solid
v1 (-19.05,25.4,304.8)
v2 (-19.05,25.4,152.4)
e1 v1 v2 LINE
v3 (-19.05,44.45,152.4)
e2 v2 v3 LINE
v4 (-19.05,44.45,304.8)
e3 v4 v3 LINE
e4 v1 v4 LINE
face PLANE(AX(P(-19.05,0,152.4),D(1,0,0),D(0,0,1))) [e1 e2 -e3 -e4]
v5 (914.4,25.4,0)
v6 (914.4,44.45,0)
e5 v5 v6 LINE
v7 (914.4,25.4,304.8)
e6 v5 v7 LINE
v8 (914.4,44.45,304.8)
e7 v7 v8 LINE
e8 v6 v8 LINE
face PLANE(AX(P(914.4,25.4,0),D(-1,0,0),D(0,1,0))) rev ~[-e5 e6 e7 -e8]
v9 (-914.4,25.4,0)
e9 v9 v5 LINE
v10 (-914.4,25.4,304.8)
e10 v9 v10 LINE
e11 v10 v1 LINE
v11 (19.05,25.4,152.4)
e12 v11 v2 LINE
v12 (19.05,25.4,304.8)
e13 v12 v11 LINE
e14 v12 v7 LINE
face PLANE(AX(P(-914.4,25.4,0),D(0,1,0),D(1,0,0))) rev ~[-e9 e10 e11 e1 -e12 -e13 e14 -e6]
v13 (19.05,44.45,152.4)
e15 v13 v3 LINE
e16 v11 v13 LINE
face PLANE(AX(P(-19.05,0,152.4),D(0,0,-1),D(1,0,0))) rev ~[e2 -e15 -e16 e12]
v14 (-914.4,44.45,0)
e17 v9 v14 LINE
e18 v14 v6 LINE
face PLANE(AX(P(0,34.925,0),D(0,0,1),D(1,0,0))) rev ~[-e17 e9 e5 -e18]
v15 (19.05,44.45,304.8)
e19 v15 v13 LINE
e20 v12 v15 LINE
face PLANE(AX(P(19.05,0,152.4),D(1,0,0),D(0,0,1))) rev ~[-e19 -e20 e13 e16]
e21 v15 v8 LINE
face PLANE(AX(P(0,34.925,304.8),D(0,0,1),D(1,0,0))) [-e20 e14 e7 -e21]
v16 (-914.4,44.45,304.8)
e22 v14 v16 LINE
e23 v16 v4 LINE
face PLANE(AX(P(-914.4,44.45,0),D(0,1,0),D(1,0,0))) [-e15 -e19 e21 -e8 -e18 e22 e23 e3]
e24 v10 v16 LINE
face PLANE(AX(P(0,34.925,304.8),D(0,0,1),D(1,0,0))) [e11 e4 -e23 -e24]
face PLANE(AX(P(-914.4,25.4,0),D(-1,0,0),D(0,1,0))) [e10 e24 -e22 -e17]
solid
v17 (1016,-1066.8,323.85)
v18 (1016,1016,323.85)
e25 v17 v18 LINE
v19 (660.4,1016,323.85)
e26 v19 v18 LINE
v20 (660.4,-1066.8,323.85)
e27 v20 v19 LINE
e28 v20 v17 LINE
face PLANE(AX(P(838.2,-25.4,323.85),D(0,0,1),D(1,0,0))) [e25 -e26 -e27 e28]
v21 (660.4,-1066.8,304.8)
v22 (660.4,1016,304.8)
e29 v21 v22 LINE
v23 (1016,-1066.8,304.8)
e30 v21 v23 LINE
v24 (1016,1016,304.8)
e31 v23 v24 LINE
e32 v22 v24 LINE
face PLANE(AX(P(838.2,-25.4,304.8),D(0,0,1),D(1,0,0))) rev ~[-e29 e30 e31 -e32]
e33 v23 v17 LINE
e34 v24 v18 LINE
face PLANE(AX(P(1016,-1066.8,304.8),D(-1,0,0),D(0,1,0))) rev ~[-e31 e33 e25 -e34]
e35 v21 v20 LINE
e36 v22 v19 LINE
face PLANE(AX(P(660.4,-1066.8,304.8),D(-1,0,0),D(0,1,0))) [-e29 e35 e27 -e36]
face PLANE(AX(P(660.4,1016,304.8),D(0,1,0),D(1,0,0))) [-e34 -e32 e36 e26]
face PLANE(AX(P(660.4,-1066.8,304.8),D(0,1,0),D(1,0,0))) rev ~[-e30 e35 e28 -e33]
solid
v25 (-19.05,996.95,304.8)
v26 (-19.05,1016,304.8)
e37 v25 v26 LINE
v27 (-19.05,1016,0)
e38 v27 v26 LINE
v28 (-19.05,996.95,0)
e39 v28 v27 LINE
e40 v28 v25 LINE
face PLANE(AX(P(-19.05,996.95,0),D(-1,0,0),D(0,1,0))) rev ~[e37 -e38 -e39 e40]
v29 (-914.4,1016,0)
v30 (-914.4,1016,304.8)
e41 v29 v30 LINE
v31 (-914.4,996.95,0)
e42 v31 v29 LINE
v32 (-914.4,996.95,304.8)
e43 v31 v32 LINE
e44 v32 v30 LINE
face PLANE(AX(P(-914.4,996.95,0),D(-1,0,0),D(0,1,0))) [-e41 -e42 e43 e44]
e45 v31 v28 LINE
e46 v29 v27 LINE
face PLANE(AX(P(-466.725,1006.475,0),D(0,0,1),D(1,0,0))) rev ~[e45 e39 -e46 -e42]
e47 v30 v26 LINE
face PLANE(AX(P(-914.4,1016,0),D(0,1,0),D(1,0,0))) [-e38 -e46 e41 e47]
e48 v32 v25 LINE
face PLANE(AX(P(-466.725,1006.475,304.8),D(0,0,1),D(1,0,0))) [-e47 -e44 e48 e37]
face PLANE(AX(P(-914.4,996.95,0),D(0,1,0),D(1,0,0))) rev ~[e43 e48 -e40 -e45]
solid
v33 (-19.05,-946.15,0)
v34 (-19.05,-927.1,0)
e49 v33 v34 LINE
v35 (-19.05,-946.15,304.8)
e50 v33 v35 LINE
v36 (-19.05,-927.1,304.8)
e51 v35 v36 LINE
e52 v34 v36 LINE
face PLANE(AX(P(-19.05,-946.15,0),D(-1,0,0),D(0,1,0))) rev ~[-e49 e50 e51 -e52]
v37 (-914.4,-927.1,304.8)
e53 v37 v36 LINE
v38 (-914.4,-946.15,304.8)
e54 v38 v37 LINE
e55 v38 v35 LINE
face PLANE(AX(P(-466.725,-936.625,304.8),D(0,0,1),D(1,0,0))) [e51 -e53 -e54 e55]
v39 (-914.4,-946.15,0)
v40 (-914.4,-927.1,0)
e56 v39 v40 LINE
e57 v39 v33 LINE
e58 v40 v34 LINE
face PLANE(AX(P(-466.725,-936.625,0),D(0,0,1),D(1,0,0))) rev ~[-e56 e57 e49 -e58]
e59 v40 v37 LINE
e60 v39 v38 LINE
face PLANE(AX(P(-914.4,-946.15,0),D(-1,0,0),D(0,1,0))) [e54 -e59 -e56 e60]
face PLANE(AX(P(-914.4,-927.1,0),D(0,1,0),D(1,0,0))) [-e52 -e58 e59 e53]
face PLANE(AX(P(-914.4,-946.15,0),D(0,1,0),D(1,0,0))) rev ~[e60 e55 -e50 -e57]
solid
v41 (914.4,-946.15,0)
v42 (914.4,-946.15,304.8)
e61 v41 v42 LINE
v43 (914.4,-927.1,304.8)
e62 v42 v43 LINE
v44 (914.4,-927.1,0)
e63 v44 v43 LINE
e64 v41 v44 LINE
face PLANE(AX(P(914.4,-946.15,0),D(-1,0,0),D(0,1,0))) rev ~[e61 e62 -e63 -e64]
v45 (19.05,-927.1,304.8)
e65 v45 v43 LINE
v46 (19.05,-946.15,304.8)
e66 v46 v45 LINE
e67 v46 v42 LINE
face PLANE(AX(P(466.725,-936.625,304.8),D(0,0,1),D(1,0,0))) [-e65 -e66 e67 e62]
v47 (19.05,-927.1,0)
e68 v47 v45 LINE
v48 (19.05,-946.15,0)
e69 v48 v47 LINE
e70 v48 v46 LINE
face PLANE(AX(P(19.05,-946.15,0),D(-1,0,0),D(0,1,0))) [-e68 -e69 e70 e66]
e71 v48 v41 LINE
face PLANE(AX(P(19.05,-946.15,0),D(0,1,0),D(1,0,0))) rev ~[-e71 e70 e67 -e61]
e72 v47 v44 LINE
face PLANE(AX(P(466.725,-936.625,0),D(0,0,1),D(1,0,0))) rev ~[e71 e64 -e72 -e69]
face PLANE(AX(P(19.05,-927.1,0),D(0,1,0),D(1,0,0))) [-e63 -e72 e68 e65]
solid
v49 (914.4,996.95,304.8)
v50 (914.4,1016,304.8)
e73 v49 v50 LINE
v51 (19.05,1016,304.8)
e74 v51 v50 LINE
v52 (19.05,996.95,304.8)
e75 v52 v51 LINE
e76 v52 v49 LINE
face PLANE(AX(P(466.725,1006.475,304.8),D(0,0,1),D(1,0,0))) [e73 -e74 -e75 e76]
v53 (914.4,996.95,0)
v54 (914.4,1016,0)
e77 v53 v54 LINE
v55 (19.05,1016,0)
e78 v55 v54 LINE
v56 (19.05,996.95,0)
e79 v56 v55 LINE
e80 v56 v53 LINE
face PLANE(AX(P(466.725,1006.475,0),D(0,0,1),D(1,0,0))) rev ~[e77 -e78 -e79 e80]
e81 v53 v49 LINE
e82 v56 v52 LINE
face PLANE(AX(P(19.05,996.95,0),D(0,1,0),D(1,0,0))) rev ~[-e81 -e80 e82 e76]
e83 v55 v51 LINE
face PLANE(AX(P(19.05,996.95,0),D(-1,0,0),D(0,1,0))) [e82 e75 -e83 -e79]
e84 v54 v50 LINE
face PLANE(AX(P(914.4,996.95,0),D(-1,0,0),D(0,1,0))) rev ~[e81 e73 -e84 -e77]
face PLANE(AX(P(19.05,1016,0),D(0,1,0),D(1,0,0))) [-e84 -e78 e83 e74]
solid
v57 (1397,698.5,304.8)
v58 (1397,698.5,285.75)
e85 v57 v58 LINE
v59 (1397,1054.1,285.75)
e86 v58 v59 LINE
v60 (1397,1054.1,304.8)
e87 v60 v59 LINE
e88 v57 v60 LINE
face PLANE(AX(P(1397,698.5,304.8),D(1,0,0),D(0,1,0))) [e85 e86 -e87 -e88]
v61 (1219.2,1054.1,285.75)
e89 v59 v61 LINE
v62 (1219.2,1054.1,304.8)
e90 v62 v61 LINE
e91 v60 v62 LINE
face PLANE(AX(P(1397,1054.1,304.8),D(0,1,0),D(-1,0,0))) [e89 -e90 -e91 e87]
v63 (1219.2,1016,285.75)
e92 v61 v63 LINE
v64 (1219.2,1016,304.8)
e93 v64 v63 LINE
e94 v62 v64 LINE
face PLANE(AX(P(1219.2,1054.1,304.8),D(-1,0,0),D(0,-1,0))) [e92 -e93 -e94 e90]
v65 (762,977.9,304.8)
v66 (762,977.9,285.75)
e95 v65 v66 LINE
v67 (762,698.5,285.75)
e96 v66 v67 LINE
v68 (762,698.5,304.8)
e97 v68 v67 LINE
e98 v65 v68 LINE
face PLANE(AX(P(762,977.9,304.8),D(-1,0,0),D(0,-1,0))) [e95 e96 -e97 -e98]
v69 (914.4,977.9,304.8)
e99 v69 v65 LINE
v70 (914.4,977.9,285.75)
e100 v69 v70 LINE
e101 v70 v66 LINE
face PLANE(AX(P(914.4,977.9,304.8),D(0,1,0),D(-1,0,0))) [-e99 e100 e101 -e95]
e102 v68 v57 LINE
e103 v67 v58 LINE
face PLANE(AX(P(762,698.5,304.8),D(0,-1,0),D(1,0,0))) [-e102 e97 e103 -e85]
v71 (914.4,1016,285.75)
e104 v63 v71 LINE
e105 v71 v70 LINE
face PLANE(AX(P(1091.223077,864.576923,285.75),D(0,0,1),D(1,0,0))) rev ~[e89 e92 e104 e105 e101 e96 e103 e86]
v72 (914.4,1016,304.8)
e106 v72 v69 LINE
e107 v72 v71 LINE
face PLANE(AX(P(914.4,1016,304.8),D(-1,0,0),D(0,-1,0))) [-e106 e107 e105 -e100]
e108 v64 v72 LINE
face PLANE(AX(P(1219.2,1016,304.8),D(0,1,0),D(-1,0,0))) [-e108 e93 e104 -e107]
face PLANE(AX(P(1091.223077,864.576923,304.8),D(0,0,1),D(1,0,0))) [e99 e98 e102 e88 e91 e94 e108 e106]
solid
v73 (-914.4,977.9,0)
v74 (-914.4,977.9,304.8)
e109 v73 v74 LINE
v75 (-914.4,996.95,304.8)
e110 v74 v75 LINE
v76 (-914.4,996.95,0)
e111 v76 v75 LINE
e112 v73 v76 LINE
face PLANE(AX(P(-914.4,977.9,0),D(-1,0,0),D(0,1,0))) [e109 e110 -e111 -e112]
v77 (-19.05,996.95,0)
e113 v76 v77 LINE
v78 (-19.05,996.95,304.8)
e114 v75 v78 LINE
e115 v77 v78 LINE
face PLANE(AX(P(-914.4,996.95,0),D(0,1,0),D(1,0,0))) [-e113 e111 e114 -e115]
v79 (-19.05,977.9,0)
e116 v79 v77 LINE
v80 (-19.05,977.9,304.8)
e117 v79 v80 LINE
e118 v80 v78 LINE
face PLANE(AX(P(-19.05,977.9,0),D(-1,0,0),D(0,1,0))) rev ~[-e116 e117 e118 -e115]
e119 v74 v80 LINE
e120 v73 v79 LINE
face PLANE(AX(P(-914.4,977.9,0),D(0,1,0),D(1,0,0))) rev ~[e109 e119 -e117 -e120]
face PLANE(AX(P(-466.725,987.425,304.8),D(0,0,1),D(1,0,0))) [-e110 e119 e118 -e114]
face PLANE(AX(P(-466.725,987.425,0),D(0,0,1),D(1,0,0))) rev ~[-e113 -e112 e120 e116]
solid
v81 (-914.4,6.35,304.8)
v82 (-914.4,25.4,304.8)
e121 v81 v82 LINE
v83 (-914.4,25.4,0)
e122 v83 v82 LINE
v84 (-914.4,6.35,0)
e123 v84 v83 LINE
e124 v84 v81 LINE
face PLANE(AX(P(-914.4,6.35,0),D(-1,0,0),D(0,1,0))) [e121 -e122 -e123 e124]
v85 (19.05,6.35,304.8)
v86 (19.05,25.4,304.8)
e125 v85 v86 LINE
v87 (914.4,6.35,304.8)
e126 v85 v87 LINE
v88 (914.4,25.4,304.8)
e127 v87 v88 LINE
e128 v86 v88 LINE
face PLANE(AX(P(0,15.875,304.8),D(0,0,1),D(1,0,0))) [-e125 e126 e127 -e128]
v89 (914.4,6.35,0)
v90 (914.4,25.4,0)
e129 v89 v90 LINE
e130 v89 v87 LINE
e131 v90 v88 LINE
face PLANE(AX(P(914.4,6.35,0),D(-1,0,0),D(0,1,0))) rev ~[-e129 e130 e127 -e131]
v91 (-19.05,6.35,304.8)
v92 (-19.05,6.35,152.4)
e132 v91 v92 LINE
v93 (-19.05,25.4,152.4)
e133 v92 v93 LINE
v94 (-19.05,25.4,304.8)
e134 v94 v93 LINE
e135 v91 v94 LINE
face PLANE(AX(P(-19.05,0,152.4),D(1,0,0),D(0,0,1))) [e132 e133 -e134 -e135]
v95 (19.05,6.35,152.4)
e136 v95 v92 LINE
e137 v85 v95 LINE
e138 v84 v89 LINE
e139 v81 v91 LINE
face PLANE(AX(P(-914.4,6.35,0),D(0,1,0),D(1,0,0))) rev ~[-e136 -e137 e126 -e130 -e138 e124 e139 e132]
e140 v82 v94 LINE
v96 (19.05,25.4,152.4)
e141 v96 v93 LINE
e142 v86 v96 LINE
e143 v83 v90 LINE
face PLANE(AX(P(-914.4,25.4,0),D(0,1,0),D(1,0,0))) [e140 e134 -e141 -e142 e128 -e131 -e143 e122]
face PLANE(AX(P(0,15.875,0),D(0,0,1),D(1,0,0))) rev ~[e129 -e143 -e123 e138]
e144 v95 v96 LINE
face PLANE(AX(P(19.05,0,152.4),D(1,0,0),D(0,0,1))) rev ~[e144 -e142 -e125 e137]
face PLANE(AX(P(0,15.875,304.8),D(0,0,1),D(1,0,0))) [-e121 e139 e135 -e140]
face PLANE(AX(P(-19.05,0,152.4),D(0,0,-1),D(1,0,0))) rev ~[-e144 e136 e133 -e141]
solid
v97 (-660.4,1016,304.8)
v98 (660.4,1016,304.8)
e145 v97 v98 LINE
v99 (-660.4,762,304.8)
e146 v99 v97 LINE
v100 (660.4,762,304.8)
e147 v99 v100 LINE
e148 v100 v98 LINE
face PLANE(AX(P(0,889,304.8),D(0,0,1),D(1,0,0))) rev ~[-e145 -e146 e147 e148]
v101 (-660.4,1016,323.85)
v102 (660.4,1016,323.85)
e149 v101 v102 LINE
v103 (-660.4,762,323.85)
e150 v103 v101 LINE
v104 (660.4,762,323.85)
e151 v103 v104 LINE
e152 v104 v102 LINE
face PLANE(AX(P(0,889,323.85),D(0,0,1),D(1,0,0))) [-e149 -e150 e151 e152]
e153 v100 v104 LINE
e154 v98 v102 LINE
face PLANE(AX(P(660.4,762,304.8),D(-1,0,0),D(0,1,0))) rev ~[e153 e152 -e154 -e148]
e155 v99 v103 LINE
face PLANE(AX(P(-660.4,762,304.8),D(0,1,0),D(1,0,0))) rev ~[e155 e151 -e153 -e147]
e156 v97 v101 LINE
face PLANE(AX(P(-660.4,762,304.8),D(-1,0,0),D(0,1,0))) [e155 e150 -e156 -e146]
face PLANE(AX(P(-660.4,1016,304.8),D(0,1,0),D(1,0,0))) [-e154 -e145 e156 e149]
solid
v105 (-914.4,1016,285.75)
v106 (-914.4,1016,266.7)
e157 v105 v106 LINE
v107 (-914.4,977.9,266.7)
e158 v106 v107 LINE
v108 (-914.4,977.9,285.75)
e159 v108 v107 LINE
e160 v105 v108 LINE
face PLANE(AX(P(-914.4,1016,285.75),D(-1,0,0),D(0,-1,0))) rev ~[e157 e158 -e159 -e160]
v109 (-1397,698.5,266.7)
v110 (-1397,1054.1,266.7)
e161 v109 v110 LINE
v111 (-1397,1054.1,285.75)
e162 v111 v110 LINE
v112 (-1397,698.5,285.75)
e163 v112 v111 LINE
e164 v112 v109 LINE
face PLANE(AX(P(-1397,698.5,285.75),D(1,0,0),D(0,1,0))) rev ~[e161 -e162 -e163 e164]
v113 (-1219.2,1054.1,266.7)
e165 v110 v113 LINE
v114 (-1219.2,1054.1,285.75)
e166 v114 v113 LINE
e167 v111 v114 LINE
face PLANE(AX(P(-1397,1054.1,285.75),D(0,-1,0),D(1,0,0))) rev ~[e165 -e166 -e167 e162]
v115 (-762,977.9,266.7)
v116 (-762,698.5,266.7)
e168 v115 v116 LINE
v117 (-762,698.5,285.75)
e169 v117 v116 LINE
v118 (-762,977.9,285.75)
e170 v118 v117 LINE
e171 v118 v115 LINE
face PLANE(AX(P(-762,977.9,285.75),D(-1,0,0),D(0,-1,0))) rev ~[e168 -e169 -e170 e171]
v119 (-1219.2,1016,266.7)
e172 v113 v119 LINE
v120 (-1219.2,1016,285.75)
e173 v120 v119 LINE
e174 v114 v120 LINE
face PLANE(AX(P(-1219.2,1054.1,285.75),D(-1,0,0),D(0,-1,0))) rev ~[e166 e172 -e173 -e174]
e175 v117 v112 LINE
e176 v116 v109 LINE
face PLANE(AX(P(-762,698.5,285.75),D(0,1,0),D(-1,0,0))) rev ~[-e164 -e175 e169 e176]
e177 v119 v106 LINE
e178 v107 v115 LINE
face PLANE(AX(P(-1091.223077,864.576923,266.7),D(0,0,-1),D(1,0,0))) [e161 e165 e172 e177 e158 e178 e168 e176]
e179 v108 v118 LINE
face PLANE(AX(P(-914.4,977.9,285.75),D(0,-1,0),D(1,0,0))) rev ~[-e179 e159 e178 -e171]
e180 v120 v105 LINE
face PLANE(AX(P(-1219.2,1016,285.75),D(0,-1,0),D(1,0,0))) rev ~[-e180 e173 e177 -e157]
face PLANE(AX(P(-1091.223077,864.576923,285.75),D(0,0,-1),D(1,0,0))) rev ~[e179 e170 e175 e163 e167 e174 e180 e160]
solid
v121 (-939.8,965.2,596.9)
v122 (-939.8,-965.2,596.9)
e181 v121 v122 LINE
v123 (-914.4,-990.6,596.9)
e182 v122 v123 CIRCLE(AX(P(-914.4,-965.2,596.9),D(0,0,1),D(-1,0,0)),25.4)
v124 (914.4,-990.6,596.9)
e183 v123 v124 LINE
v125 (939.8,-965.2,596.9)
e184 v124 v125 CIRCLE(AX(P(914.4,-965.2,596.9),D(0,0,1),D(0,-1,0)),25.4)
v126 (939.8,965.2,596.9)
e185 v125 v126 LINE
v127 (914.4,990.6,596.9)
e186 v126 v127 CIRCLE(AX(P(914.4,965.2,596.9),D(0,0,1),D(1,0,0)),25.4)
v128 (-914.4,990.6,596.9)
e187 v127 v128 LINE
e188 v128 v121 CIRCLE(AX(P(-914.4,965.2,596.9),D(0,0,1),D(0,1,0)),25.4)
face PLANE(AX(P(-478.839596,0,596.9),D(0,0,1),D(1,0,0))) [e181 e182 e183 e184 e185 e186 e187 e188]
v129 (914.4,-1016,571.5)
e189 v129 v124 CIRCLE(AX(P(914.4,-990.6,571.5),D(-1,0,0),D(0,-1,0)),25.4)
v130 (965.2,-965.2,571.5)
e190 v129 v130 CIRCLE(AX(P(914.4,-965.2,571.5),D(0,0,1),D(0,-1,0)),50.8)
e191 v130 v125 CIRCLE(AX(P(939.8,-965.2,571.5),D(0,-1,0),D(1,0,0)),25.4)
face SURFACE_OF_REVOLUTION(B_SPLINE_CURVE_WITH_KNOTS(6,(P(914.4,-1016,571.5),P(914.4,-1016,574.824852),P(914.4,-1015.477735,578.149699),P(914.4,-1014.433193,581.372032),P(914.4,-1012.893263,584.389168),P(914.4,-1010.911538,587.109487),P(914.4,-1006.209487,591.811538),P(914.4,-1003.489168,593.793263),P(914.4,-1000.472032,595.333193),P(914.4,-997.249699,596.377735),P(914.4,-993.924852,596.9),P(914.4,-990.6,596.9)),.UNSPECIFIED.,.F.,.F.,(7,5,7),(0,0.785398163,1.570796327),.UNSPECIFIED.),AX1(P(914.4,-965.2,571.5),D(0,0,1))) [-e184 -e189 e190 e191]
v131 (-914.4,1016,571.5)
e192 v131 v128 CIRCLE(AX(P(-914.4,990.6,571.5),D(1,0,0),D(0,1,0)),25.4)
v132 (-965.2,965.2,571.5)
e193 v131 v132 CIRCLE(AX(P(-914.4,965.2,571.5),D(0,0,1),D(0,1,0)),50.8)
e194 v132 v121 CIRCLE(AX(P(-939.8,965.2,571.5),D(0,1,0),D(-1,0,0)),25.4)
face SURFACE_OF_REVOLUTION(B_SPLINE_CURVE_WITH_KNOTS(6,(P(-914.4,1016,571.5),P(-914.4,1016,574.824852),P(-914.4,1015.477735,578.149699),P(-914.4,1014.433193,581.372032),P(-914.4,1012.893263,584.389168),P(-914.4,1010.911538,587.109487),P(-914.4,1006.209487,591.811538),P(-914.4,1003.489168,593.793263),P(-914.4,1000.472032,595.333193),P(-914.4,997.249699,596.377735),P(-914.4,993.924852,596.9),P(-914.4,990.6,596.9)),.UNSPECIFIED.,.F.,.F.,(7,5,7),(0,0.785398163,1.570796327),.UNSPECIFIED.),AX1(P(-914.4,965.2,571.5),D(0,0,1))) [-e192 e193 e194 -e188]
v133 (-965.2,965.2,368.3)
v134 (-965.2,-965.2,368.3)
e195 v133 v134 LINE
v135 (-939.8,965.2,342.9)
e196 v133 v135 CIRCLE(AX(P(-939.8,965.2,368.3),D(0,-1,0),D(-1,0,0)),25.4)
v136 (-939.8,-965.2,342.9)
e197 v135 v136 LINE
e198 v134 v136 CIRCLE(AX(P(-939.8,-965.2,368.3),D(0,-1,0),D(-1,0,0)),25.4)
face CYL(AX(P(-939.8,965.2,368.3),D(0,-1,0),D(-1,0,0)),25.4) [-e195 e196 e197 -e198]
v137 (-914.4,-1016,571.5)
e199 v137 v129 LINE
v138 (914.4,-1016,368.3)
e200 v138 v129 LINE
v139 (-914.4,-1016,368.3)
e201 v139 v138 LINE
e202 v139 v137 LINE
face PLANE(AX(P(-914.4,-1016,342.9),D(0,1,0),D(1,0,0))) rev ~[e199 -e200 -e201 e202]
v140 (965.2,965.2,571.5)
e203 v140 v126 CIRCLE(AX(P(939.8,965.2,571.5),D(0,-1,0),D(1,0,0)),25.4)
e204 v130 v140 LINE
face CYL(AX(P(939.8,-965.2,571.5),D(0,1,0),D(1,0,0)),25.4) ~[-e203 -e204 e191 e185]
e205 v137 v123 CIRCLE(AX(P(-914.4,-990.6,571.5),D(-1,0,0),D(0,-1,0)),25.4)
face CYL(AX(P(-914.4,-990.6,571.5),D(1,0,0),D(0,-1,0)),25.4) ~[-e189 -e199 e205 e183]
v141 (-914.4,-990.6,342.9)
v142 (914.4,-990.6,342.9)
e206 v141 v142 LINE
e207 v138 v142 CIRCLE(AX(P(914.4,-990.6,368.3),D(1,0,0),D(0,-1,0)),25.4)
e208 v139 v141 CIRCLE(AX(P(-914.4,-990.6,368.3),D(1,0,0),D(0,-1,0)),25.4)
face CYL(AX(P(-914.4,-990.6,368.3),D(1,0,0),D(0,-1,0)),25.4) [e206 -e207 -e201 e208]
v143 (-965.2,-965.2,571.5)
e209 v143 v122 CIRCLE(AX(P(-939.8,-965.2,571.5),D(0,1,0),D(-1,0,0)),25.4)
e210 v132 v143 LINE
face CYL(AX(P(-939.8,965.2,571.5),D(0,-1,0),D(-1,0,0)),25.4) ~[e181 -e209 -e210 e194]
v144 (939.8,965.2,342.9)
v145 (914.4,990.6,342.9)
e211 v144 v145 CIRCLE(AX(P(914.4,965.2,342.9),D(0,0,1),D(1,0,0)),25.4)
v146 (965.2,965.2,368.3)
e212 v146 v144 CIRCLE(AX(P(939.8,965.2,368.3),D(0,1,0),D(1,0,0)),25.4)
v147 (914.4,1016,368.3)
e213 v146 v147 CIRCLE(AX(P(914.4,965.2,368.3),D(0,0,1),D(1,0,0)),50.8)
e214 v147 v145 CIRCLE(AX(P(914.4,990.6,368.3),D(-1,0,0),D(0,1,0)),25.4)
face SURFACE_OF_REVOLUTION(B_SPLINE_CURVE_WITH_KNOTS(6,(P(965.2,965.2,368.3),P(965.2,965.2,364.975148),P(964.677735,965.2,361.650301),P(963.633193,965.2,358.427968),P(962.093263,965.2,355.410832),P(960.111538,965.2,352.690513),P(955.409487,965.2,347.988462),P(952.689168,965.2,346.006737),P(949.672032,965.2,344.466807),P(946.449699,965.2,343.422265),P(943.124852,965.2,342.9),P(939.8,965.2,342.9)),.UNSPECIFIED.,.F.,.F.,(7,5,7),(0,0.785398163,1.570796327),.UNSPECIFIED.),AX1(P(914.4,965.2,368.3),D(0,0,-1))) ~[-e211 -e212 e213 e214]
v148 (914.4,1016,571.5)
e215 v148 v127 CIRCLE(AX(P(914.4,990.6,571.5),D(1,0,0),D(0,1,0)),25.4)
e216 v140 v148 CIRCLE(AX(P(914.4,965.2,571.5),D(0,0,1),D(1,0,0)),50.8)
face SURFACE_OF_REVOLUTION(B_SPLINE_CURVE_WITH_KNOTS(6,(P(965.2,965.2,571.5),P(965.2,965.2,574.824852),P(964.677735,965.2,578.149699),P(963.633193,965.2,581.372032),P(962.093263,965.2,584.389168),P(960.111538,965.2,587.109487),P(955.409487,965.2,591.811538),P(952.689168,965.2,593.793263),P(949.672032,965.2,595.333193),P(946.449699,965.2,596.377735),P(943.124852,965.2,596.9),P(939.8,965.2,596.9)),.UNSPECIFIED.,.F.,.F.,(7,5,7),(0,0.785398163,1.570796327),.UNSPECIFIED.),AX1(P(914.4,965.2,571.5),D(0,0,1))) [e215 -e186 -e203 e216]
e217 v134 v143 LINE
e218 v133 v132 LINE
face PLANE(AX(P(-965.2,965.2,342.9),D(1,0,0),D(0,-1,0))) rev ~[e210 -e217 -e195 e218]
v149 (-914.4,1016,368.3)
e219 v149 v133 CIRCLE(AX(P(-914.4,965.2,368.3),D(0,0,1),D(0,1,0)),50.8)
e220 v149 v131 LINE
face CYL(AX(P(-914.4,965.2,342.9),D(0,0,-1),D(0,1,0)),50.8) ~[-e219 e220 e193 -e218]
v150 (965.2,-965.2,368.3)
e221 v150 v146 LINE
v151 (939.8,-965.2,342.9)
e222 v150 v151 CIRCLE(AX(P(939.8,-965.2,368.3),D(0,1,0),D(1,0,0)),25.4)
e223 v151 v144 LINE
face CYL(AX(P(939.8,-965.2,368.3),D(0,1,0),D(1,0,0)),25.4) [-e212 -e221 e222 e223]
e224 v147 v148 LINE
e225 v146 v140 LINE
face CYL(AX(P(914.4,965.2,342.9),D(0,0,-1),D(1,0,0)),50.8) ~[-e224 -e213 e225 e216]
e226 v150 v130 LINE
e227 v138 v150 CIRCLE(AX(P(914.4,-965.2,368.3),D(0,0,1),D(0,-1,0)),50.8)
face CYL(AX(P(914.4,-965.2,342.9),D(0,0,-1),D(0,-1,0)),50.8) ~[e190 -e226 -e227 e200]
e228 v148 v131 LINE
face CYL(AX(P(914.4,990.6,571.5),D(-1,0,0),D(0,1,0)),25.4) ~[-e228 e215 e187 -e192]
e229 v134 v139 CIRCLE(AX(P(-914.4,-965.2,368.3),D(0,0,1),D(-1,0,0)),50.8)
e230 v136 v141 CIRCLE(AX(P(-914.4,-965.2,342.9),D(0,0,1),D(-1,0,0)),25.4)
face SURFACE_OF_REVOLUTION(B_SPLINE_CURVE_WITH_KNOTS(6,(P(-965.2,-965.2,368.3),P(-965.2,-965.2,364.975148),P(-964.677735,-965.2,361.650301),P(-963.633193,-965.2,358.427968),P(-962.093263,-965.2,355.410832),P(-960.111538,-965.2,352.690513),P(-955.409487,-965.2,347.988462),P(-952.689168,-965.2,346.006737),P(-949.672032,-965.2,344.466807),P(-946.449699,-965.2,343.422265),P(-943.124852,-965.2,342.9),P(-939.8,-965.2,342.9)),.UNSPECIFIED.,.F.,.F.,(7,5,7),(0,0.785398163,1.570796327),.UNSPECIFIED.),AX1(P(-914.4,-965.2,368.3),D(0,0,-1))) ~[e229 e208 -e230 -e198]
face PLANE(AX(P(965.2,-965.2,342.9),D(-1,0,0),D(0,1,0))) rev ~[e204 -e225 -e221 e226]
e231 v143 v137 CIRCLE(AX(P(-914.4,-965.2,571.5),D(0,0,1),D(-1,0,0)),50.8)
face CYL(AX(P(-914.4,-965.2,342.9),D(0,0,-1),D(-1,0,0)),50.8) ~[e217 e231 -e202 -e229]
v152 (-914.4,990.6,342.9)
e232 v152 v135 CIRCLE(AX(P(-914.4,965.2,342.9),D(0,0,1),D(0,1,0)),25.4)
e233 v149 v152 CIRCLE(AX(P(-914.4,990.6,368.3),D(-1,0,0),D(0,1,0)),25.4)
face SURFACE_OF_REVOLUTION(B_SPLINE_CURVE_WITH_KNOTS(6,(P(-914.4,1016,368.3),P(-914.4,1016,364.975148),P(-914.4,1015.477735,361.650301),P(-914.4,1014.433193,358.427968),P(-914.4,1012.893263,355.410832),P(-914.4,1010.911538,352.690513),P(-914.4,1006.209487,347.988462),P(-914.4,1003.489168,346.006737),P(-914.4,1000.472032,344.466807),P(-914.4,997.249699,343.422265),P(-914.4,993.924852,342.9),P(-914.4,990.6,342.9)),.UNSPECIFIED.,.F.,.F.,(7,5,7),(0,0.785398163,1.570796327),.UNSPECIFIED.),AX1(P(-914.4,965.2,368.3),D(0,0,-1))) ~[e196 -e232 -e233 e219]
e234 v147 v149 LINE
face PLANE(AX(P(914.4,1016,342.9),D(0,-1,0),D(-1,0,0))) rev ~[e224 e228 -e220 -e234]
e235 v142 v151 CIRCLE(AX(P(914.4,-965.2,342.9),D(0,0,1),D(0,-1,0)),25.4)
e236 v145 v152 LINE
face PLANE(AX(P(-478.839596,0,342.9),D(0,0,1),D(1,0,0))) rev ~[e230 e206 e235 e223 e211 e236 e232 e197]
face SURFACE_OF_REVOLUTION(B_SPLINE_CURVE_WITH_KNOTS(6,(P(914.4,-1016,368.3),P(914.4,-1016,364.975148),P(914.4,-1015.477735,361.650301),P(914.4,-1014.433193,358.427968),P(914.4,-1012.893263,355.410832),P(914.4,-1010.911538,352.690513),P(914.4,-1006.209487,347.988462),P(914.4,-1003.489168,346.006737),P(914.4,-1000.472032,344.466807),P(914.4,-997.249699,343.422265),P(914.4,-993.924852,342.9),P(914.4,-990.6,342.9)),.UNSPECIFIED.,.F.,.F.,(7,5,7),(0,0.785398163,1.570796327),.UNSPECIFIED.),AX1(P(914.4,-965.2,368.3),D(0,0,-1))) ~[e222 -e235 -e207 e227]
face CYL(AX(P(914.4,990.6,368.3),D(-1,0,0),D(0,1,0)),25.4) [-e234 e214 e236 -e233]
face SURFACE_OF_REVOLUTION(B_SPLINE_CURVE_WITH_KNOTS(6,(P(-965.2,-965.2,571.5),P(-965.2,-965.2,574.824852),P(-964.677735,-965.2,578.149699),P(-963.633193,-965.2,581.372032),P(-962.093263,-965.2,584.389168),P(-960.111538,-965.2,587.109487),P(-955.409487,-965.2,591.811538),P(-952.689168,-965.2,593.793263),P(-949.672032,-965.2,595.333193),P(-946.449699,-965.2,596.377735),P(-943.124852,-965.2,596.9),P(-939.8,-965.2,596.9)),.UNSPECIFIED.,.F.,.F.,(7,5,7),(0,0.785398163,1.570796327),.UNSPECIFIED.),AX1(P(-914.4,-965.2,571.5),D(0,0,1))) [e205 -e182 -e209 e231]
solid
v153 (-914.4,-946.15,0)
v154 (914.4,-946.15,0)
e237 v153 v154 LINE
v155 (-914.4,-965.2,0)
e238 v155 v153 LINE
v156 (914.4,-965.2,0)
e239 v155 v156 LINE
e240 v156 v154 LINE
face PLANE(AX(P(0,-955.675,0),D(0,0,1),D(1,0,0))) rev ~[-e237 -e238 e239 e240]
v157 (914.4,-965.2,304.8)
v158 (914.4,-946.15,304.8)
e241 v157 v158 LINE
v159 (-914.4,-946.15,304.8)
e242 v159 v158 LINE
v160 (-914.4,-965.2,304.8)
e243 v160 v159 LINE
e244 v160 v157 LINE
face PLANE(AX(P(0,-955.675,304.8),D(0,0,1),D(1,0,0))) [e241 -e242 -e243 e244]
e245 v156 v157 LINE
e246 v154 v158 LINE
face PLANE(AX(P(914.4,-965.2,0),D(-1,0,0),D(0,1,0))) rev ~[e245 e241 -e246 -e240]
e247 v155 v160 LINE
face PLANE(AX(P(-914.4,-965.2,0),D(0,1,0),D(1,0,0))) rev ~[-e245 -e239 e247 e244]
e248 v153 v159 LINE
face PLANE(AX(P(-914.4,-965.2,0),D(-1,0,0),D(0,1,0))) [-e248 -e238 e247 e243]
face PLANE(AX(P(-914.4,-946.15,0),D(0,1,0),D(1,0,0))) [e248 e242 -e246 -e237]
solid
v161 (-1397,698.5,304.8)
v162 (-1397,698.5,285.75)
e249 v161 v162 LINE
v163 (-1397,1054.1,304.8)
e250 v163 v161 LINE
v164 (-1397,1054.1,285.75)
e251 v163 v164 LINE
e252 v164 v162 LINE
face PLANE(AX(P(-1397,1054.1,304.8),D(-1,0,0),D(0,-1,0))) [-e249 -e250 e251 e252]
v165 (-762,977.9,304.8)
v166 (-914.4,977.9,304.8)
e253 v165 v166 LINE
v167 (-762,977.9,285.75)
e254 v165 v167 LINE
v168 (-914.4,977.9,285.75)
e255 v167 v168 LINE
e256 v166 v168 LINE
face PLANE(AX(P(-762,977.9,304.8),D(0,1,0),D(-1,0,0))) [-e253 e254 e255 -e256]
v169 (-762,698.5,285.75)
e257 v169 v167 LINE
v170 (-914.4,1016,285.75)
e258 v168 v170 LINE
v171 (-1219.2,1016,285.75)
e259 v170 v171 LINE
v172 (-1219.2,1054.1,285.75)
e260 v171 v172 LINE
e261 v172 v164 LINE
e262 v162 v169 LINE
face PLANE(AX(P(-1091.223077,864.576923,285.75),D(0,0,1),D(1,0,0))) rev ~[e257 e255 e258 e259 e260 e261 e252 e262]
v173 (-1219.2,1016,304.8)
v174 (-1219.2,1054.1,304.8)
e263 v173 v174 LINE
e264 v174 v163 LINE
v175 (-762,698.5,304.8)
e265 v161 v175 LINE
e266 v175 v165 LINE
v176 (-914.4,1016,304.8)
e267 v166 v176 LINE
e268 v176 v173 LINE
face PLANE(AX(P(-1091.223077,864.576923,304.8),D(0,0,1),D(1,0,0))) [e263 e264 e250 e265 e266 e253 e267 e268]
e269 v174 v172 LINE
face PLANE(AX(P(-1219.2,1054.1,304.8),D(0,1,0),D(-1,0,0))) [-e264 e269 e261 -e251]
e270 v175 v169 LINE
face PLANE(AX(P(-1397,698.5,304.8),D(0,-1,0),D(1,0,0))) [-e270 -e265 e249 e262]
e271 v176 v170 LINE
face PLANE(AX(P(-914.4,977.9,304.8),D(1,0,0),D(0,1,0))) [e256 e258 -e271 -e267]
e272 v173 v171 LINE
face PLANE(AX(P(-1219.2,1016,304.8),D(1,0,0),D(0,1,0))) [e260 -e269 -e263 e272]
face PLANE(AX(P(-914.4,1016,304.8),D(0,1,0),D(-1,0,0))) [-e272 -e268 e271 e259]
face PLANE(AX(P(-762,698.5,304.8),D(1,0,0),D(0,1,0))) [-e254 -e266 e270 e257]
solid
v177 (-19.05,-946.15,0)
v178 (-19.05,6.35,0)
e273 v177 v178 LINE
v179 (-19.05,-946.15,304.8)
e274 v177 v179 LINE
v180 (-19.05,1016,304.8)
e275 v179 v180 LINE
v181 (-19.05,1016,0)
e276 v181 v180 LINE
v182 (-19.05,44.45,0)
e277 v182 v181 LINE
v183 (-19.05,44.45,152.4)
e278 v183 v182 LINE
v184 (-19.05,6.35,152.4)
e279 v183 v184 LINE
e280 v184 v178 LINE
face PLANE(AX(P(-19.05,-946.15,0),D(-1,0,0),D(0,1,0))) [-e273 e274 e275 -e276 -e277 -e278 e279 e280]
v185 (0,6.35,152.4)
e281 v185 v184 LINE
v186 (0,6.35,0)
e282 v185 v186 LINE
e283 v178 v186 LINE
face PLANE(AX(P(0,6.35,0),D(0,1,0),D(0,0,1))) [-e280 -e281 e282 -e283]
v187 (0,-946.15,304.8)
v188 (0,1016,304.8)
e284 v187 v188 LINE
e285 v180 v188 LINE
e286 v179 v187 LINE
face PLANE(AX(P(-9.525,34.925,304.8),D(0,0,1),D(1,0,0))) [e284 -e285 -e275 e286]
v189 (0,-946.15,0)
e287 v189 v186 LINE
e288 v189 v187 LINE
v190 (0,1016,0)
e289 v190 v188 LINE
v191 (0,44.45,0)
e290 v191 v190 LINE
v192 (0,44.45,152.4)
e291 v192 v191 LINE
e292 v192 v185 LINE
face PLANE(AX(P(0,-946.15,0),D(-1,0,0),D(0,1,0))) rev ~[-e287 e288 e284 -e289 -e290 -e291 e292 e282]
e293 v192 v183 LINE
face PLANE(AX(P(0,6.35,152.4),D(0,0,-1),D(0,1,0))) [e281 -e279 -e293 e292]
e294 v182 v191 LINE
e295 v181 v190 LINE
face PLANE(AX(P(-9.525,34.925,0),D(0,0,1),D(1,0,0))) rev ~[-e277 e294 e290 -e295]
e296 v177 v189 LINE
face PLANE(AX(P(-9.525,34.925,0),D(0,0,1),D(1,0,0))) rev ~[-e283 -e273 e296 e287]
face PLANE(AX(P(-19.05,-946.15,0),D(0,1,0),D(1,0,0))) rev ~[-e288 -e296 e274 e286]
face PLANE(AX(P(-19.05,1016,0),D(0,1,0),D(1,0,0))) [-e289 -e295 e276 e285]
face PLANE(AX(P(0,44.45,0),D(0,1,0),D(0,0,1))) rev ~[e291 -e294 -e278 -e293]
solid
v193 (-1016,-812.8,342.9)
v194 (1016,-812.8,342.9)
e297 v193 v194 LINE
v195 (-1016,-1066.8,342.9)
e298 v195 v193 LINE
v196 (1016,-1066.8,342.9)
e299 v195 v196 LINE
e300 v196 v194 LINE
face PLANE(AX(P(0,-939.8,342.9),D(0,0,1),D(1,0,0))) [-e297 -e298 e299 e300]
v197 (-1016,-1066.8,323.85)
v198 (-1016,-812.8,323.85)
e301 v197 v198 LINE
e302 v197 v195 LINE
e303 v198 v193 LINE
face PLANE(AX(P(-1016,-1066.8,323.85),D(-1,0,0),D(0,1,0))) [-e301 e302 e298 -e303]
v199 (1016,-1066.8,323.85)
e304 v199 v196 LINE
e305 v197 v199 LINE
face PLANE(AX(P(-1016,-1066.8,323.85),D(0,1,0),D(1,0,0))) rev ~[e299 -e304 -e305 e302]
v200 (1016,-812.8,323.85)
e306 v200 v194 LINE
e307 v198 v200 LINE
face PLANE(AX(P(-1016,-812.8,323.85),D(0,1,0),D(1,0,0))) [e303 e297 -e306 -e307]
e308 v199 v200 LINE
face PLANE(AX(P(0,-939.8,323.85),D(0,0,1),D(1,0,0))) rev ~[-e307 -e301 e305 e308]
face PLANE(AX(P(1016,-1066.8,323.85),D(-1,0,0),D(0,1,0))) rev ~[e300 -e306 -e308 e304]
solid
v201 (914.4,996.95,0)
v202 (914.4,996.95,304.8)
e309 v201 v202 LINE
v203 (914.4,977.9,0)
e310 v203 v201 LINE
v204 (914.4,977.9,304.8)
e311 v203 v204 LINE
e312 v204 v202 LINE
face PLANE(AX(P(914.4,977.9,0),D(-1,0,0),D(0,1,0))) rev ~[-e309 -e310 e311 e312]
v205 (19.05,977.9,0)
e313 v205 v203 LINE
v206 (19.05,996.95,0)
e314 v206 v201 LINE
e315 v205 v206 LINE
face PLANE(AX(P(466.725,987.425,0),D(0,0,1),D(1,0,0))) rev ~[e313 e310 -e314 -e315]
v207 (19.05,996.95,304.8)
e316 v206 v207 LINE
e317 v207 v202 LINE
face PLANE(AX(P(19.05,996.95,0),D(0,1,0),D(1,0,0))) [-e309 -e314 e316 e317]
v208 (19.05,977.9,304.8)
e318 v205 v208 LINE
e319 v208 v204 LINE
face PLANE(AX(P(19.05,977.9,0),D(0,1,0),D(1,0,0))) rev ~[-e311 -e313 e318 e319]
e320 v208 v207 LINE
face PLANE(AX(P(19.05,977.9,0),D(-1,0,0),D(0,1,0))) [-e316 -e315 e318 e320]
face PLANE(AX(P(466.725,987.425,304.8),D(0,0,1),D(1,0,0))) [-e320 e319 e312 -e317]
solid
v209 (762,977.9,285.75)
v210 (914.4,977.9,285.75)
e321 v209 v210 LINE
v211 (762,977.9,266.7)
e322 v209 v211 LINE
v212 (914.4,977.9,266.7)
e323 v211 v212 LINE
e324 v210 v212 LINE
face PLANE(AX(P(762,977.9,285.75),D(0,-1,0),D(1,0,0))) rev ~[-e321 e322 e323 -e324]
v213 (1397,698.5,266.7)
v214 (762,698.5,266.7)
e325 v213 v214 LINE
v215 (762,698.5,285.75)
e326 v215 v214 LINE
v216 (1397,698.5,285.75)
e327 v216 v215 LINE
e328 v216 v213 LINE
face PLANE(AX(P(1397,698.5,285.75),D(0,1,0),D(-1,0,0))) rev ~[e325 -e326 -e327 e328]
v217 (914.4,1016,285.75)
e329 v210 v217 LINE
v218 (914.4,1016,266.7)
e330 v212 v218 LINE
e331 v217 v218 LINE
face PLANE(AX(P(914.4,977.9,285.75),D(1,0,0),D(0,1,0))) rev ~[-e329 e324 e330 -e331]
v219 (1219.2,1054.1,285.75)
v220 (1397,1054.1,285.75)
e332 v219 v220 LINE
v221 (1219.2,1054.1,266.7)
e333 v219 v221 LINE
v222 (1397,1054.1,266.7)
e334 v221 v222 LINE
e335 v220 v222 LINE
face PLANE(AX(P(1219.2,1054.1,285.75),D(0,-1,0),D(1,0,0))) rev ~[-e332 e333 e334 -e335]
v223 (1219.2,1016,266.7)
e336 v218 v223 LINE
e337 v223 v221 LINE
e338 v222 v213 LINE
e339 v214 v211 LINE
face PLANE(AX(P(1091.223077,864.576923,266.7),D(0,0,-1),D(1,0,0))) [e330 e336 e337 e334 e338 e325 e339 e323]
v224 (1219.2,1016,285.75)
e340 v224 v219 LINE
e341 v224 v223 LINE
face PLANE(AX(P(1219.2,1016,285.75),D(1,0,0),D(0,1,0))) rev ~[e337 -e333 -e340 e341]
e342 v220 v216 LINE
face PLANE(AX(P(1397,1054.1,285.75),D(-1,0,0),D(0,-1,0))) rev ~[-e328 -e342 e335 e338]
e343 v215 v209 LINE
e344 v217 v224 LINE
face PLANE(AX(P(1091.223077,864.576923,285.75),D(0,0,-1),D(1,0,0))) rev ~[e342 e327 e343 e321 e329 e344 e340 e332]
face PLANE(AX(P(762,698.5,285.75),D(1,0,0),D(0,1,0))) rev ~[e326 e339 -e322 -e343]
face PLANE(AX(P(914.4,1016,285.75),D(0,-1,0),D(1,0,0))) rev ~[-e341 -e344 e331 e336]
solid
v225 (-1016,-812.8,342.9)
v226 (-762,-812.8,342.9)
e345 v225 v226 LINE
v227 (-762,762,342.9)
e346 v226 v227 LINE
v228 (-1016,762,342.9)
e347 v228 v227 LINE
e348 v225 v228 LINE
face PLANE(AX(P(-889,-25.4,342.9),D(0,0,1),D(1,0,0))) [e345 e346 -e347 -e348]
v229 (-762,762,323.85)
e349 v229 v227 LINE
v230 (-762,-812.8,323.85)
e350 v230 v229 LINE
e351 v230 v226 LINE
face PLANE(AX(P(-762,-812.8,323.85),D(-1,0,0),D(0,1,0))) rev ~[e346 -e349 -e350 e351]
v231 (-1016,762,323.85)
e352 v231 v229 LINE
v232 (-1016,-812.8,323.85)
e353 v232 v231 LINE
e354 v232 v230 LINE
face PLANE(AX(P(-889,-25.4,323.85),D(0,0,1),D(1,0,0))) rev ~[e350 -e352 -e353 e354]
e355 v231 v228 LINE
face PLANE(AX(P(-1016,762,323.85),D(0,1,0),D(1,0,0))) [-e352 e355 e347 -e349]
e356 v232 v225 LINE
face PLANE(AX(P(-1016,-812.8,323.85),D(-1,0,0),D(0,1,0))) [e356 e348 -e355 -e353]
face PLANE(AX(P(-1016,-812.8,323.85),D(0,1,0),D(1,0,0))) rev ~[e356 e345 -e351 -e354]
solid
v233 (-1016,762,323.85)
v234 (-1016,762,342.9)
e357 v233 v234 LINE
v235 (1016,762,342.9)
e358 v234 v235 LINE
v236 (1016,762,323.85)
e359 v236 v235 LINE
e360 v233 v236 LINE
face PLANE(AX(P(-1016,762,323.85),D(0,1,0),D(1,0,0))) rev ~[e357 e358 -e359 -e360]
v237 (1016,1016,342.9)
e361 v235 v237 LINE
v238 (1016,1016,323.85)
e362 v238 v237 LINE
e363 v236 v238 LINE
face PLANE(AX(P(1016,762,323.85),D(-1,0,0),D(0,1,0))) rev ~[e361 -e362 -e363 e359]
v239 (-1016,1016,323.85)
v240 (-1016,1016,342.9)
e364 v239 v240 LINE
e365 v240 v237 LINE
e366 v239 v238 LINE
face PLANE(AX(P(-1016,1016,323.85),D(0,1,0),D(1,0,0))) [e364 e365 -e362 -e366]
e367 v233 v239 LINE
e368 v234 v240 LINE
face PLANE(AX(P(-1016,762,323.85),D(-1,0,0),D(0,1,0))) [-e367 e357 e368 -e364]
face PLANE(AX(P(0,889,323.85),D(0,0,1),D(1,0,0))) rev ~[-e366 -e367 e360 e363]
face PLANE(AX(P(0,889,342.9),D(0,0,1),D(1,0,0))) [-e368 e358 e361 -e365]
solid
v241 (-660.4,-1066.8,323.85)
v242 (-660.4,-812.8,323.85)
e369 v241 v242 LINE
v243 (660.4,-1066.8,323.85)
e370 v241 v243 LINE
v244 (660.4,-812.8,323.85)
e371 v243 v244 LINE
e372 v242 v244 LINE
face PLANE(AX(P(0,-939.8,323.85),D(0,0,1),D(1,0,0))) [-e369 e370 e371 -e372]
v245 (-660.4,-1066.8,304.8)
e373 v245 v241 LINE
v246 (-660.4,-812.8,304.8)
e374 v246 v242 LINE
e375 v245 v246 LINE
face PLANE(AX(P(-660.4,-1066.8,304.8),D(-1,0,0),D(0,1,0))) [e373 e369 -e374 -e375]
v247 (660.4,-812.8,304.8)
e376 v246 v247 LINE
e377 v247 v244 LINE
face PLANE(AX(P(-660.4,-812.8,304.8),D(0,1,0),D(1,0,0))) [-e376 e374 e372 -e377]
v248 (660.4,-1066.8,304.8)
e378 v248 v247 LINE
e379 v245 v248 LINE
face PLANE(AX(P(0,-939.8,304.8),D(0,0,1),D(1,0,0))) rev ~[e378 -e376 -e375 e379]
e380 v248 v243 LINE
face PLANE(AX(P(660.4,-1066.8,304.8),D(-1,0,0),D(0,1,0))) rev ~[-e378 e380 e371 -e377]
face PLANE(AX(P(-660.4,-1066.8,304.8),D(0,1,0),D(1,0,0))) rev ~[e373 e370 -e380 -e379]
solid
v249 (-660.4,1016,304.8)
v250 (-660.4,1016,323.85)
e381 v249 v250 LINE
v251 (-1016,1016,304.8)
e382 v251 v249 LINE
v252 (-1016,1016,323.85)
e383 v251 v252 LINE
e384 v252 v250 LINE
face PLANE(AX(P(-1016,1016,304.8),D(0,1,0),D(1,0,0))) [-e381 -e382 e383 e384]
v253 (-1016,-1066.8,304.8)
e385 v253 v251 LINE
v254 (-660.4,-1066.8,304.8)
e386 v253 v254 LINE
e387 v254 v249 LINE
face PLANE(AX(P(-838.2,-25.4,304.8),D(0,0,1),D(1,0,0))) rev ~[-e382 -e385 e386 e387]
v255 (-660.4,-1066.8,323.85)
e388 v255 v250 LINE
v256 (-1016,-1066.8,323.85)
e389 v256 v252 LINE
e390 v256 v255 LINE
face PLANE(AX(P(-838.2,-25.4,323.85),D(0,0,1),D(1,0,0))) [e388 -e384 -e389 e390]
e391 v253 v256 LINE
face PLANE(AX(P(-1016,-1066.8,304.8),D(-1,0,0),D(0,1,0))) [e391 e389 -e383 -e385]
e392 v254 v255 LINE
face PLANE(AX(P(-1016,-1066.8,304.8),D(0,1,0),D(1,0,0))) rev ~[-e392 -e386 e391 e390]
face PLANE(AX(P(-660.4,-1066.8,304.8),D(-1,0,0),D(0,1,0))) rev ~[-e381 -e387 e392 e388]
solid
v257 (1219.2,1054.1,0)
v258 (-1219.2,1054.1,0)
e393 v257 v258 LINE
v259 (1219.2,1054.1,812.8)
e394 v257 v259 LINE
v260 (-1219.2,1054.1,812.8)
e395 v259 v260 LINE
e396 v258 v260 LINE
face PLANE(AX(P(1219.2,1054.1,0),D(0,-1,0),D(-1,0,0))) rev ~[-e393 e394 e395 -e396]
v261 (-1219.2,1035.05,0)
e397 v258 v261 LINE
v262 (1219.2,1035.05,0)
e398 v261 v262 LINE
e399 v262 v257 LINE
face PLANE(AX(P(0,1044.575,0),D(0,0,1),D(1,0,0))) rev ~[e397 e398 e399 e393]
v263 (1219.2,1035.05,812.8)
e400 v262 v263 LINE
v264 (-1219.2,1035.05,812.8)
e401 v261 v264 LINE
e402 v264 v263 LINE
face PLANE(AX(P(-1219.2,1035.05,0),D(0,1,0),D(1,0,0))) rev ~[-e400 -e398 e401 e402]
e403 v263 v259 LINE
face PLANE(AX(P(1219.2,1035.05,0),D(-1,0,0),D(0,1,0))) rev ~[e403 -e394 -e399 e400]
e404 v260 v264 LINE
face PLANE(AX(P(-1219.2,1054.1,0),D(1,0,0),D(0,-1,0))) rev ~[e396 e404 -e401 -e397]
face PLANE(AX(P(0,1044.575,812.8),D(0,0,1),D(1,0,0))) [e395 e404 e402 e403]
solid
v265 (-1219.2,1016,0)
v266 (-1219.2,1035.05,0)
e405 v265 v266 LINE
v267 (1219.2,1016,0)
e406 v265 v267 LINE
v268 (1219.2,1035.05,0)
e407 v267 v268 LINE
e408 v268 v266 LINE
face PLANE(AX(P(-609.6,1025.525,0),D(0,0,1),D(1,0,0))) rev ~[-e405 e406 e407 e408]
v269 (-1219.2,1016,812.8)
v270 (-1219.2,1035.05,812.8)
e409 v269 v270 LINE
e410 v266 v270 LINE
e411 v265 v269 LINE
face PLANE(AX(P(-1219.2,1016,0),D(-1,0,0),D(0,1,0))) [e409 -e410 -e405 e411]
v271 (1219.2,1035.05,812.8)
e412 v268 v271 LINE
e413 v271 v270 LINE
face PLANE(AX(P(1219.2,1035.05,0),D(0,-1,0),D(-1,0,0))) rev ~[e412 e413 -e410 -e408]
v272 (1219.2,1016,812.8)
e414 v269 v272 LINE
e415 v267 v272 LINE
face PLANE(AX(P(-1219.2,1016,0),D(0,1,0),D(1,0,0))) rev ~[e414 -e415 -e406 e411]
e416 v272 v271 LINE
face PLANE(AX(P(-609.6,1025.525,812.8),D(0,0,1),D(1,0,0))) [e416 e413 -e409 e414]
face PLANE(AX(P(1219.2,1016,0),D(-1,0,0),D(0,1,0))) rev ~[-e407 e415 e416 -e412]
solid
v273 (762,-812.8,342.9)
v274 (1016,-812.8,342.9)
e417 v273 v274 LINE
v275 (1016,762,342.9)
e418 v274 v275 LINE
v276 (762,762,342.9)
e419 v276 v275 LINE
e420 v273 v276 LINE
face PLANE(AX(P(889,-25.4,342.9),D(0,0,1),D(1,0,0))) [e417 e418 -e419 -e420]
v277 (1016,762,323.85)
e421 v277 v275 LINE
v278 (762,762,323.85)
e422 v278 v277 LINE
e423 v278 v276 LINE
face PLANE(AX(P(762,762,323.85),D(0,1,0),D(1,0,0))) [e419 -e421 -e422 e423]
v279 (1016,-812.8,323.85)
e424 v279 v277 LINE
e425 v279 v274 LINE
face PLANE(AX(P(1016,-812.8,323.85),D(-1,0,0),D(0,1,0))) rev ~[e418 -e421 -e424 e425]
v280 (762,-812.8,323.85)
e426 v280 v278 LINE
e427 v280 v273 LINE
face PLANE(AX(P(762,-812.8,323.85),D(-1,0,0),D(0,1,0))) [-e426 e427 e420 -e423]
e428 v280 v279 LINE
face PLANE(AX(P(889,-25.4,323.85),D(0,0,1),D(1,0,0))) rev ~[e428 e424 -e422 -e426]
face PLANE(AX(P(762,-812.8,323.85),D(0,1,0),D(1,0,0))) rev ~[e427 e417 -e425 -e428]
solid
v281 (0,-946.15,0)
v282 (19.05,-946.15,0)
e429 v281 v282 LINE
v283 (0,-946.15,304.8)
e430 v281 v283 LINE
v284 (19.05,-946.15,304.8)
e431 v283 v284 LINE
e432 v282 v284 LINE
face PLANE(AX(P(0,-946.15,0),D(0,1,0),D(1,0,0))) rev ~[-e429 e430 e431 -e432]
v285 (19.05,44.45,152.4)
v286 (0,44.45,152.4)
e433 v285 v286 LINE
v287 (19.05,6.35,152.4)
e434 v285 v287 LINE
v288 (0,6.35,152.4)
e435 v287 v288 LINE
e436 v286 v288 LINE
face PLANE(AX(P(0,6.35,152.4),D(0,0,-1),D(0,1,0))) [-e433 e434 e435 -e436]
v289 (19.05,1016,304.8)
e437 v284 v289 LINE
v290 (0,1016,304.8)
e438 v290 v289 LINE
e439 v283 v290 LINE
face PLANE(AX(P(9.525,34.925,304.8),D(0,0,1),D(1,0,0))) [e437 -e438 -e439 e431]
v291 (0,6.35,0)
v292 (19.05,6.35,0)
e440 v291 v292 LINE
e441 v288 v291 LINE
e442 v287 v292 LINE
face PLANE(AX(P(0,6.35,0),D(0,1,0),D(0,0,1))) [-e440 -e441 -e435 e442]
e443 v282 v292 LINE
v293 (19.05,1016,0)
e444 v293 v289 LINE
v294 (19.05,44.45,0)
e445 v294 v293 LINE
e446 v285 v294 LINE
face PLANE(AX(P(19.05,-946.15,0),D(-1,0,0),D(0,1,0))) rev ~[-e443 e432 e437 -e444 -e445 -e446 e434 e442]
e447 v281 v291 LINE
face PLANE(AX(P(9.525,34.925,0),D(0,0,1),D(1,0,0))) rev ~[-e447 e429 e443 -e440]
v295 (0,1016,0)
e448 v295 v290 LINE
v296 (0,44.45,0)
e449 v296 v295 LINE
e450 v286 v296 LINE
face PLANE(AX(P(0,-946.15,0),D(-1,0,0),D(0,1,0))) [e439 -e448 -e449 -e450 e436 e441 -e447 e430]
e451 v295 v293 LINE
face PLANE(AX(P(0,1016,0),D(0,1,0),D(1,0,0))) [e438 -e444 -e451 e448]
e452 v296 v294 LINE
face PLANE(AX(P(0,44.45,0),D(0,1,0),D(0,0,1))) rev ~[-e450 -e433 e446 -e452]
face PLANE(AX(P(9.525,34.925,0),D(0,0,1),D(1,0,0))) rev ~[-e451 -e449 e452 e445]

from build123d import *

# Parameters (mm, degrees)
F7_W      = 1219.2
F7_H      = 19.05
F8_DEPTH  = 812.8
F10_DEPTH = 812.8
F11_W     = 895.35
F11_H     = 19.05
F12_DEPTH = 304.8
F11_W_2   = 1828.8
F13_W     = 895.35
F13_H     = 19.05
F14_DEPTH = 304.8
F13_W_2   = 1828.8
F15_W     = 19.05
F15_H     = 1962.15
F16_DEPTH = 304.8
F17_W     = 19.05
F17_H     = 1962.15
F18_DEPTH = 304.8
F19_W     = 38.1
F19_H     = 152.4
F20_DEPTH = 1054.101
F21_W     = 38.1
F21_H     = 152.4000000002
F22_DEPTH = 76.2
F23_W     = 1320.8
F23_H     = 254
F24_DEPTH = 19.05
F25_W     = 355.6
F25_H     = 2082.8
F26_DEPTH = 19.05
F27_W     = 2032
F27_H     = 254
F28_DEPTH = 19.05
F29_W     = 254
F29_H     = 1574.8
F30_DEPTH = 19.05
F32_DEPTH = 19.05
F34_DEPTH = 19.05
F36_DEPTH = 254
F37_R     = 25.4


with BuildPart() as f8:
    # F7 (on Top) → F8 (new body)
    with BuildSketch(Plane.XY):
        with Locations((-609.6, 1025.525)):
            Rectangle(F7_W, F7_H)
        with Locations((609.6, 1025.525)):
            Rectangle(F7_W, F7_H)
    extrude(amount=F8_DEPTH)


with BuildPart() as f10:
    # F9 (on Top) → F10 (new body, through all)
    with BuildSketch(Plane.XY):
        Polygon((-1219.2, 1054.1), (-1219.2, 1035.05), (0, 1035.05), (1219.2, 1035.05), (1219.2, 1054.1), align=None)
    extrude(amount=F10_DEPTH)


with BuildPart() as f12:
    # F11 (on Top) → F12 (new body, through all)
    with BuildSketch(Plane.XY):
        with Locations((-466.725, 987.425)):
            Rectangle(F11_W, F11_H)
    extrude(amount=F12_DEPTH)


with BuildPart() as f12b:
    # F11 (on Top) → F12, piece 2 (new body, through all)
    with BuildSketch(Plane.XY):
        with Locations((466.725, 987.425)):
            Rectangle(F11_W, F11_H)
    extrude(amount=F12_DEPTH)


with BuildPart() as f12c:
    # F11 (on Top) → F12, piece 3 (new body, through all)
    with BuildSketch(Plane.XY):
        with Locations((0, 15.875)):
            Rectangle(F11_W_2, F11_H)
    extrude(amount=F12_DEPTH)


with BuildPart() as f12d:
    # F11 (on Top) → F12, piece 4 (new body, through all)
    with BuildSketch(Plane.XY):
        with Locations((0, -955.675)):
            Rectangle(F11_W_2, F11_H)
    extrude(amount=F12_DEPTH)


with BuildPart() as f14:
    # F13 (on Top) → F14 (new body, through all)
    with BuildSketch(Plane.XY):
        with Locations((-466.725, 1006.475)):
            Rectangle(F13_W, F13_H)
    extrude(amount=F14_DEPTH)


with BuildPart() as f14b:
    # F13 (on Top) → F14, piece 2 (new body, through all)
    with BuildSketch(Plane.XY):
        with Locations((466.725, 1006.475)):
            Rectangle(F13_W, F13_H)
    extrude(amount=F14_DEPTH)


with BuildPart() as f14c:
    # F13 (on Top) → F14, piece 3 (new body, through all)
    with BuildSketch(Plane.XY):
        with Locations((0, 34.925)):
            Rectangle(F13_W_2, F13_H)
    extrude(amount=F14_DEPTH)


with BuildPart() as f14d:
    # F13 (on Top) → F14, piece 4 (new body, through all)
    with BuildSketch(Plane.XY):
        with Locations((-466.725, -936.625)):
            Rectangle(F13_W, F13_H)
    extrude(amount=F14_DEPTH)


with BuildPart() as f14e:
    # F13 (on Top) → F14, piece 5 (new body, through all)
    with BuildSketch(Plane.XY):
        with Locations((466.725, -936.625)):
            Rectangle(F13_W, F13_H)
    extrude(amount=F14_DEPTH)


with BuildPart() as f16:
    # F15 (on Top) → F16 (new body, through all)
    with BuildSketch(Plane.XY):
        with Locations((-9.525, 34.925)):
            Rectangle(F15_W, F15_H)
    extrude(amount=F16_DEPTH)


with BuildPart() as f18:
    # F17 (on Top) → F18 (new body, through all)
    with BuildSketch(Plane.XY):
        with Locations((9.525, 34.925)):
            Rectangle(F17_W, F17_H)
    extrude(amount=F18_DEPTH)


with BuildPart() as f20_tool:
    # F19 (on Front) → F20 (new body, through all)
    with BuildSketch(Plane.XZ):
        with Locations((0, 228.6)):
            Rectangle(F19_W, F19_H)
    extrude(amount=-F20_DEPTH)


with BuildPart() as f12c_1:
    add(f12c.part)

    # F20: cut by f20_tool
    add(f20_tool.part, mode=Mode.SUBTRACT)


with BuildPart() as f14c_1:
    add(f14c.part)

    # F20: cut by f20_tool
    add(f20_tool.part, mode=Mode.SUBTRACT)


with BuildPart() as f22_tool:
    # F21 (on Right) → F22 (new body, symmetric)
    with BuildSketch(Plane.YZ):
        with Locations((25.4, 76.2000000001)):
            Rectangle(F21_W, F21_H)
    extrude(amount=F22_DEPTH, both=True)


with BuildPart() as f16_1:
    add(f16.part)

    # F22: cut by f22_tool
    add(f22_tool.part, mode=Mode.SUBTRACT)


with BuildPart() as f18_1:
    add(f18.part)

    # F22: cut by f22_tool
    add(f22_tool.part, mode=Mode.SUBTRACT)


with BuildPart() as f24:
    # F23 (on offset) → F24 (new body)
    with BuildSketch(Plane.XY.offset(304.8)):
        with Locations((0, 889)):
            Rectangle(F23_W, F23_H)
    extrude(amount=F24_DEPTH)


with BuildPart() as f24b:
    # F23 (on offset) → F24, piece 2 (new body)
    with BuildSketch(Plane.XY.offset(304.8)):
        with Locations((0, -939.8)):
            Rectangle(F23_W, F23_H)
    extrude(amount=F24_DEPTH)


with BuildPart() as f26:
    # F25 (on offset) → F26 (new body)
    with BuildSketch(Plane.XY.offset(304.8)):
        with Locations((-838.2, -25.4)):
            Rectangle(F25_W, F25_H)
    extrude(amount=F26_DEPTH)


with BuildPart() as f26b:
    # F25 (on offset) → F26, piece 2 (new body)
    with BuildSketch(Plane.XY.offset(304.8)):
        with Locations((838.2, -25.4)):
            Rectangle(F25_W, F25_H)
    extrude(amount=F26_DEPTH)


with BuildPart() as f28:
    # F27 (on face) → F28 (new body)
    with BuildSketch(Plane.XY.offset(323.85)):
        with Locations((0, 889)):
            Rectangle(F27_W, F27_H)
    extrude(amount=F28_DEPTH)


with BuildPart() as f28b:
    # F27 (on face) → F28, piece 2 (new body)
    with BuildSketch(Plane.XY.offset(323.85)):
        with Locations((0, -939.8)):
            Rectangle(F27_W, F27_H)
    extrude(amount=F28_DEPTH)


with BuildPart() as f30:
    # F29 (on face) → F30 (new body)
    with BuildSketch(Plane.XY.offset(323.85)):
        with Locations((-889, -25.4)):
            Rectangle(F29_W, F29_H)
    extrude(amount=F30_DEPTH)


with BuildPart() as f30b:
    # F29 (on face) → F30, piece 2 (new body)
    with BuildSketch(Plane.XY.offset(323.85)):
        with Locations((889, -25.4)):
            Rectangle(F29_W, F29_H)
    extrude(amount=F30_DEPTH)


with BuildPart() as f32:
    # F31 (on offset) → F32 (new body)
    with BuildSketch(Plane.XY.offset(304.8)):
        Polygon((-1397, 1054.1), (-1397, 698.5), (-762, 698.5), (-762, 977.9), (-914.4, 977.9), (-914.4, 1016), (-1219.2, 1016), (-1219.2, 1054.1), align=None)
    extrude(amount=-F32_DEPTH)


with BuildPart() as f32b:
    # F31 (on offset) → F32, piece 2 (new body)
    with BuildSketch(Plane.XY.offset(304.8)):
        Polygon((1397, 698.5), (1397, 1054.1), (1219.2, 1054.1), (1219.2, 1016), (914.4, 1016), (914.4, 977.9), (762, 977.9), (762, 698.5), align=None)
    extrude(amount=-F32_DEPTH)


with BuildPart() as f34:
    # F33 (on face) → F34 (new body)
    with BuildSketch(Plane(origin=(0, 0, 285.75), x_dir=(1, 0, 0), z_dir=(0, 0, -1))):
        Polygon((-762, -698.5), (-1397, -698.5), (-1397, -1054.1), (-1219.2, -1054.1), (-1219.2, -1016), (-914.4, -1016), (-914.4, -977.9), (-762, -977.9), align=None)
    extrude(amount=F34_DEPTH)


with BuildPart() as f34b:
    # F33 (on face) → F34, piece 2 (new body)
    with BuildSketch(Plane(origin=(0, 0, 285.75), x_dir=(1, 0, 0), z_dir=(0, 0, -1))):
        Polygon((1219.2, -1054.1), (1397, -1054.1), (1397, -698.5), (762, -698.5), (762, -977.9), (914.4, -977.9), (914.4, -1016), (1219.2, -1016), align=None)
    extrude(amount=F34_DEPTH)


with BuildPart() as f36:
    # F35 (on face) → F36 (new body)
    with BuildSketch(Plane.XY.offset(342.9)):
        with BuildLine():
            Line((0, 1016), (-914.4, 1016))
            ThreePointArc((-914.4, 1016), (-950.3210244843, 1001.1210244843), (-965.2, 965.2))
            Line((-965.2, 965.2), (-965.2, -965.2))
            ThreePointArc((-965.2, -965.2), (-950.3210244843, -1001.1210244843), (-914.4, -1016))
            Line((-914.4, -1016), (0, -1016))
            Line((0, -1016), (0, 1016))
        make_face()
        with BuildLine():
            Line((914.4, 1016), (0, 1016))
            Line((0, 1016), (0, -1016))
            Line((0, -1016), (914.4, -1016))
            ThreePointArc((914.4, -1016), (950.3210244843, -1001.1210244843), (965.2, -965.2))
            Line((965.2, -965.2), (965.2, 965.2))
            ThreePointArc((965.2, 965.2), (950.3210244843, 1001.1210244843), (914.4, 1016))
        make_face()
    extrude(amount=F36_DEPTH)

    # F37
    f37_edges = [f36.edges().sort_by_distance(p)[0] for p in [
        (0, -1016, 596.9),
        (0, -1016, 342.9),
        (-950.321024, 1001.121024, 596.9),
        (-965.2, 0, 596.9),
        (-950.321024, -1001.121024, 596.9),
        (950.321024, -1001.121024, 596.9),
        (965.2, 0, 596.9),
        (950.321024, 1001.121024, 596.9),
    ]]
    fillet(f37_edges, radius=F37_R)


solid = Compound([f8.part, f10.part, f12.part, f12b.part, f12d.part, f14.part, f14b.part, f14d.part, f14e.part, f12c_1.part, f14c_1.part, f16_1.part, f18_1.part, f24.part, f24b.part, f26.part, f26b.part, f28.part, f28b.part, f30.part, f30b.part, f32.part, f32b.part, f34.part, f34b.part, f36.part])
